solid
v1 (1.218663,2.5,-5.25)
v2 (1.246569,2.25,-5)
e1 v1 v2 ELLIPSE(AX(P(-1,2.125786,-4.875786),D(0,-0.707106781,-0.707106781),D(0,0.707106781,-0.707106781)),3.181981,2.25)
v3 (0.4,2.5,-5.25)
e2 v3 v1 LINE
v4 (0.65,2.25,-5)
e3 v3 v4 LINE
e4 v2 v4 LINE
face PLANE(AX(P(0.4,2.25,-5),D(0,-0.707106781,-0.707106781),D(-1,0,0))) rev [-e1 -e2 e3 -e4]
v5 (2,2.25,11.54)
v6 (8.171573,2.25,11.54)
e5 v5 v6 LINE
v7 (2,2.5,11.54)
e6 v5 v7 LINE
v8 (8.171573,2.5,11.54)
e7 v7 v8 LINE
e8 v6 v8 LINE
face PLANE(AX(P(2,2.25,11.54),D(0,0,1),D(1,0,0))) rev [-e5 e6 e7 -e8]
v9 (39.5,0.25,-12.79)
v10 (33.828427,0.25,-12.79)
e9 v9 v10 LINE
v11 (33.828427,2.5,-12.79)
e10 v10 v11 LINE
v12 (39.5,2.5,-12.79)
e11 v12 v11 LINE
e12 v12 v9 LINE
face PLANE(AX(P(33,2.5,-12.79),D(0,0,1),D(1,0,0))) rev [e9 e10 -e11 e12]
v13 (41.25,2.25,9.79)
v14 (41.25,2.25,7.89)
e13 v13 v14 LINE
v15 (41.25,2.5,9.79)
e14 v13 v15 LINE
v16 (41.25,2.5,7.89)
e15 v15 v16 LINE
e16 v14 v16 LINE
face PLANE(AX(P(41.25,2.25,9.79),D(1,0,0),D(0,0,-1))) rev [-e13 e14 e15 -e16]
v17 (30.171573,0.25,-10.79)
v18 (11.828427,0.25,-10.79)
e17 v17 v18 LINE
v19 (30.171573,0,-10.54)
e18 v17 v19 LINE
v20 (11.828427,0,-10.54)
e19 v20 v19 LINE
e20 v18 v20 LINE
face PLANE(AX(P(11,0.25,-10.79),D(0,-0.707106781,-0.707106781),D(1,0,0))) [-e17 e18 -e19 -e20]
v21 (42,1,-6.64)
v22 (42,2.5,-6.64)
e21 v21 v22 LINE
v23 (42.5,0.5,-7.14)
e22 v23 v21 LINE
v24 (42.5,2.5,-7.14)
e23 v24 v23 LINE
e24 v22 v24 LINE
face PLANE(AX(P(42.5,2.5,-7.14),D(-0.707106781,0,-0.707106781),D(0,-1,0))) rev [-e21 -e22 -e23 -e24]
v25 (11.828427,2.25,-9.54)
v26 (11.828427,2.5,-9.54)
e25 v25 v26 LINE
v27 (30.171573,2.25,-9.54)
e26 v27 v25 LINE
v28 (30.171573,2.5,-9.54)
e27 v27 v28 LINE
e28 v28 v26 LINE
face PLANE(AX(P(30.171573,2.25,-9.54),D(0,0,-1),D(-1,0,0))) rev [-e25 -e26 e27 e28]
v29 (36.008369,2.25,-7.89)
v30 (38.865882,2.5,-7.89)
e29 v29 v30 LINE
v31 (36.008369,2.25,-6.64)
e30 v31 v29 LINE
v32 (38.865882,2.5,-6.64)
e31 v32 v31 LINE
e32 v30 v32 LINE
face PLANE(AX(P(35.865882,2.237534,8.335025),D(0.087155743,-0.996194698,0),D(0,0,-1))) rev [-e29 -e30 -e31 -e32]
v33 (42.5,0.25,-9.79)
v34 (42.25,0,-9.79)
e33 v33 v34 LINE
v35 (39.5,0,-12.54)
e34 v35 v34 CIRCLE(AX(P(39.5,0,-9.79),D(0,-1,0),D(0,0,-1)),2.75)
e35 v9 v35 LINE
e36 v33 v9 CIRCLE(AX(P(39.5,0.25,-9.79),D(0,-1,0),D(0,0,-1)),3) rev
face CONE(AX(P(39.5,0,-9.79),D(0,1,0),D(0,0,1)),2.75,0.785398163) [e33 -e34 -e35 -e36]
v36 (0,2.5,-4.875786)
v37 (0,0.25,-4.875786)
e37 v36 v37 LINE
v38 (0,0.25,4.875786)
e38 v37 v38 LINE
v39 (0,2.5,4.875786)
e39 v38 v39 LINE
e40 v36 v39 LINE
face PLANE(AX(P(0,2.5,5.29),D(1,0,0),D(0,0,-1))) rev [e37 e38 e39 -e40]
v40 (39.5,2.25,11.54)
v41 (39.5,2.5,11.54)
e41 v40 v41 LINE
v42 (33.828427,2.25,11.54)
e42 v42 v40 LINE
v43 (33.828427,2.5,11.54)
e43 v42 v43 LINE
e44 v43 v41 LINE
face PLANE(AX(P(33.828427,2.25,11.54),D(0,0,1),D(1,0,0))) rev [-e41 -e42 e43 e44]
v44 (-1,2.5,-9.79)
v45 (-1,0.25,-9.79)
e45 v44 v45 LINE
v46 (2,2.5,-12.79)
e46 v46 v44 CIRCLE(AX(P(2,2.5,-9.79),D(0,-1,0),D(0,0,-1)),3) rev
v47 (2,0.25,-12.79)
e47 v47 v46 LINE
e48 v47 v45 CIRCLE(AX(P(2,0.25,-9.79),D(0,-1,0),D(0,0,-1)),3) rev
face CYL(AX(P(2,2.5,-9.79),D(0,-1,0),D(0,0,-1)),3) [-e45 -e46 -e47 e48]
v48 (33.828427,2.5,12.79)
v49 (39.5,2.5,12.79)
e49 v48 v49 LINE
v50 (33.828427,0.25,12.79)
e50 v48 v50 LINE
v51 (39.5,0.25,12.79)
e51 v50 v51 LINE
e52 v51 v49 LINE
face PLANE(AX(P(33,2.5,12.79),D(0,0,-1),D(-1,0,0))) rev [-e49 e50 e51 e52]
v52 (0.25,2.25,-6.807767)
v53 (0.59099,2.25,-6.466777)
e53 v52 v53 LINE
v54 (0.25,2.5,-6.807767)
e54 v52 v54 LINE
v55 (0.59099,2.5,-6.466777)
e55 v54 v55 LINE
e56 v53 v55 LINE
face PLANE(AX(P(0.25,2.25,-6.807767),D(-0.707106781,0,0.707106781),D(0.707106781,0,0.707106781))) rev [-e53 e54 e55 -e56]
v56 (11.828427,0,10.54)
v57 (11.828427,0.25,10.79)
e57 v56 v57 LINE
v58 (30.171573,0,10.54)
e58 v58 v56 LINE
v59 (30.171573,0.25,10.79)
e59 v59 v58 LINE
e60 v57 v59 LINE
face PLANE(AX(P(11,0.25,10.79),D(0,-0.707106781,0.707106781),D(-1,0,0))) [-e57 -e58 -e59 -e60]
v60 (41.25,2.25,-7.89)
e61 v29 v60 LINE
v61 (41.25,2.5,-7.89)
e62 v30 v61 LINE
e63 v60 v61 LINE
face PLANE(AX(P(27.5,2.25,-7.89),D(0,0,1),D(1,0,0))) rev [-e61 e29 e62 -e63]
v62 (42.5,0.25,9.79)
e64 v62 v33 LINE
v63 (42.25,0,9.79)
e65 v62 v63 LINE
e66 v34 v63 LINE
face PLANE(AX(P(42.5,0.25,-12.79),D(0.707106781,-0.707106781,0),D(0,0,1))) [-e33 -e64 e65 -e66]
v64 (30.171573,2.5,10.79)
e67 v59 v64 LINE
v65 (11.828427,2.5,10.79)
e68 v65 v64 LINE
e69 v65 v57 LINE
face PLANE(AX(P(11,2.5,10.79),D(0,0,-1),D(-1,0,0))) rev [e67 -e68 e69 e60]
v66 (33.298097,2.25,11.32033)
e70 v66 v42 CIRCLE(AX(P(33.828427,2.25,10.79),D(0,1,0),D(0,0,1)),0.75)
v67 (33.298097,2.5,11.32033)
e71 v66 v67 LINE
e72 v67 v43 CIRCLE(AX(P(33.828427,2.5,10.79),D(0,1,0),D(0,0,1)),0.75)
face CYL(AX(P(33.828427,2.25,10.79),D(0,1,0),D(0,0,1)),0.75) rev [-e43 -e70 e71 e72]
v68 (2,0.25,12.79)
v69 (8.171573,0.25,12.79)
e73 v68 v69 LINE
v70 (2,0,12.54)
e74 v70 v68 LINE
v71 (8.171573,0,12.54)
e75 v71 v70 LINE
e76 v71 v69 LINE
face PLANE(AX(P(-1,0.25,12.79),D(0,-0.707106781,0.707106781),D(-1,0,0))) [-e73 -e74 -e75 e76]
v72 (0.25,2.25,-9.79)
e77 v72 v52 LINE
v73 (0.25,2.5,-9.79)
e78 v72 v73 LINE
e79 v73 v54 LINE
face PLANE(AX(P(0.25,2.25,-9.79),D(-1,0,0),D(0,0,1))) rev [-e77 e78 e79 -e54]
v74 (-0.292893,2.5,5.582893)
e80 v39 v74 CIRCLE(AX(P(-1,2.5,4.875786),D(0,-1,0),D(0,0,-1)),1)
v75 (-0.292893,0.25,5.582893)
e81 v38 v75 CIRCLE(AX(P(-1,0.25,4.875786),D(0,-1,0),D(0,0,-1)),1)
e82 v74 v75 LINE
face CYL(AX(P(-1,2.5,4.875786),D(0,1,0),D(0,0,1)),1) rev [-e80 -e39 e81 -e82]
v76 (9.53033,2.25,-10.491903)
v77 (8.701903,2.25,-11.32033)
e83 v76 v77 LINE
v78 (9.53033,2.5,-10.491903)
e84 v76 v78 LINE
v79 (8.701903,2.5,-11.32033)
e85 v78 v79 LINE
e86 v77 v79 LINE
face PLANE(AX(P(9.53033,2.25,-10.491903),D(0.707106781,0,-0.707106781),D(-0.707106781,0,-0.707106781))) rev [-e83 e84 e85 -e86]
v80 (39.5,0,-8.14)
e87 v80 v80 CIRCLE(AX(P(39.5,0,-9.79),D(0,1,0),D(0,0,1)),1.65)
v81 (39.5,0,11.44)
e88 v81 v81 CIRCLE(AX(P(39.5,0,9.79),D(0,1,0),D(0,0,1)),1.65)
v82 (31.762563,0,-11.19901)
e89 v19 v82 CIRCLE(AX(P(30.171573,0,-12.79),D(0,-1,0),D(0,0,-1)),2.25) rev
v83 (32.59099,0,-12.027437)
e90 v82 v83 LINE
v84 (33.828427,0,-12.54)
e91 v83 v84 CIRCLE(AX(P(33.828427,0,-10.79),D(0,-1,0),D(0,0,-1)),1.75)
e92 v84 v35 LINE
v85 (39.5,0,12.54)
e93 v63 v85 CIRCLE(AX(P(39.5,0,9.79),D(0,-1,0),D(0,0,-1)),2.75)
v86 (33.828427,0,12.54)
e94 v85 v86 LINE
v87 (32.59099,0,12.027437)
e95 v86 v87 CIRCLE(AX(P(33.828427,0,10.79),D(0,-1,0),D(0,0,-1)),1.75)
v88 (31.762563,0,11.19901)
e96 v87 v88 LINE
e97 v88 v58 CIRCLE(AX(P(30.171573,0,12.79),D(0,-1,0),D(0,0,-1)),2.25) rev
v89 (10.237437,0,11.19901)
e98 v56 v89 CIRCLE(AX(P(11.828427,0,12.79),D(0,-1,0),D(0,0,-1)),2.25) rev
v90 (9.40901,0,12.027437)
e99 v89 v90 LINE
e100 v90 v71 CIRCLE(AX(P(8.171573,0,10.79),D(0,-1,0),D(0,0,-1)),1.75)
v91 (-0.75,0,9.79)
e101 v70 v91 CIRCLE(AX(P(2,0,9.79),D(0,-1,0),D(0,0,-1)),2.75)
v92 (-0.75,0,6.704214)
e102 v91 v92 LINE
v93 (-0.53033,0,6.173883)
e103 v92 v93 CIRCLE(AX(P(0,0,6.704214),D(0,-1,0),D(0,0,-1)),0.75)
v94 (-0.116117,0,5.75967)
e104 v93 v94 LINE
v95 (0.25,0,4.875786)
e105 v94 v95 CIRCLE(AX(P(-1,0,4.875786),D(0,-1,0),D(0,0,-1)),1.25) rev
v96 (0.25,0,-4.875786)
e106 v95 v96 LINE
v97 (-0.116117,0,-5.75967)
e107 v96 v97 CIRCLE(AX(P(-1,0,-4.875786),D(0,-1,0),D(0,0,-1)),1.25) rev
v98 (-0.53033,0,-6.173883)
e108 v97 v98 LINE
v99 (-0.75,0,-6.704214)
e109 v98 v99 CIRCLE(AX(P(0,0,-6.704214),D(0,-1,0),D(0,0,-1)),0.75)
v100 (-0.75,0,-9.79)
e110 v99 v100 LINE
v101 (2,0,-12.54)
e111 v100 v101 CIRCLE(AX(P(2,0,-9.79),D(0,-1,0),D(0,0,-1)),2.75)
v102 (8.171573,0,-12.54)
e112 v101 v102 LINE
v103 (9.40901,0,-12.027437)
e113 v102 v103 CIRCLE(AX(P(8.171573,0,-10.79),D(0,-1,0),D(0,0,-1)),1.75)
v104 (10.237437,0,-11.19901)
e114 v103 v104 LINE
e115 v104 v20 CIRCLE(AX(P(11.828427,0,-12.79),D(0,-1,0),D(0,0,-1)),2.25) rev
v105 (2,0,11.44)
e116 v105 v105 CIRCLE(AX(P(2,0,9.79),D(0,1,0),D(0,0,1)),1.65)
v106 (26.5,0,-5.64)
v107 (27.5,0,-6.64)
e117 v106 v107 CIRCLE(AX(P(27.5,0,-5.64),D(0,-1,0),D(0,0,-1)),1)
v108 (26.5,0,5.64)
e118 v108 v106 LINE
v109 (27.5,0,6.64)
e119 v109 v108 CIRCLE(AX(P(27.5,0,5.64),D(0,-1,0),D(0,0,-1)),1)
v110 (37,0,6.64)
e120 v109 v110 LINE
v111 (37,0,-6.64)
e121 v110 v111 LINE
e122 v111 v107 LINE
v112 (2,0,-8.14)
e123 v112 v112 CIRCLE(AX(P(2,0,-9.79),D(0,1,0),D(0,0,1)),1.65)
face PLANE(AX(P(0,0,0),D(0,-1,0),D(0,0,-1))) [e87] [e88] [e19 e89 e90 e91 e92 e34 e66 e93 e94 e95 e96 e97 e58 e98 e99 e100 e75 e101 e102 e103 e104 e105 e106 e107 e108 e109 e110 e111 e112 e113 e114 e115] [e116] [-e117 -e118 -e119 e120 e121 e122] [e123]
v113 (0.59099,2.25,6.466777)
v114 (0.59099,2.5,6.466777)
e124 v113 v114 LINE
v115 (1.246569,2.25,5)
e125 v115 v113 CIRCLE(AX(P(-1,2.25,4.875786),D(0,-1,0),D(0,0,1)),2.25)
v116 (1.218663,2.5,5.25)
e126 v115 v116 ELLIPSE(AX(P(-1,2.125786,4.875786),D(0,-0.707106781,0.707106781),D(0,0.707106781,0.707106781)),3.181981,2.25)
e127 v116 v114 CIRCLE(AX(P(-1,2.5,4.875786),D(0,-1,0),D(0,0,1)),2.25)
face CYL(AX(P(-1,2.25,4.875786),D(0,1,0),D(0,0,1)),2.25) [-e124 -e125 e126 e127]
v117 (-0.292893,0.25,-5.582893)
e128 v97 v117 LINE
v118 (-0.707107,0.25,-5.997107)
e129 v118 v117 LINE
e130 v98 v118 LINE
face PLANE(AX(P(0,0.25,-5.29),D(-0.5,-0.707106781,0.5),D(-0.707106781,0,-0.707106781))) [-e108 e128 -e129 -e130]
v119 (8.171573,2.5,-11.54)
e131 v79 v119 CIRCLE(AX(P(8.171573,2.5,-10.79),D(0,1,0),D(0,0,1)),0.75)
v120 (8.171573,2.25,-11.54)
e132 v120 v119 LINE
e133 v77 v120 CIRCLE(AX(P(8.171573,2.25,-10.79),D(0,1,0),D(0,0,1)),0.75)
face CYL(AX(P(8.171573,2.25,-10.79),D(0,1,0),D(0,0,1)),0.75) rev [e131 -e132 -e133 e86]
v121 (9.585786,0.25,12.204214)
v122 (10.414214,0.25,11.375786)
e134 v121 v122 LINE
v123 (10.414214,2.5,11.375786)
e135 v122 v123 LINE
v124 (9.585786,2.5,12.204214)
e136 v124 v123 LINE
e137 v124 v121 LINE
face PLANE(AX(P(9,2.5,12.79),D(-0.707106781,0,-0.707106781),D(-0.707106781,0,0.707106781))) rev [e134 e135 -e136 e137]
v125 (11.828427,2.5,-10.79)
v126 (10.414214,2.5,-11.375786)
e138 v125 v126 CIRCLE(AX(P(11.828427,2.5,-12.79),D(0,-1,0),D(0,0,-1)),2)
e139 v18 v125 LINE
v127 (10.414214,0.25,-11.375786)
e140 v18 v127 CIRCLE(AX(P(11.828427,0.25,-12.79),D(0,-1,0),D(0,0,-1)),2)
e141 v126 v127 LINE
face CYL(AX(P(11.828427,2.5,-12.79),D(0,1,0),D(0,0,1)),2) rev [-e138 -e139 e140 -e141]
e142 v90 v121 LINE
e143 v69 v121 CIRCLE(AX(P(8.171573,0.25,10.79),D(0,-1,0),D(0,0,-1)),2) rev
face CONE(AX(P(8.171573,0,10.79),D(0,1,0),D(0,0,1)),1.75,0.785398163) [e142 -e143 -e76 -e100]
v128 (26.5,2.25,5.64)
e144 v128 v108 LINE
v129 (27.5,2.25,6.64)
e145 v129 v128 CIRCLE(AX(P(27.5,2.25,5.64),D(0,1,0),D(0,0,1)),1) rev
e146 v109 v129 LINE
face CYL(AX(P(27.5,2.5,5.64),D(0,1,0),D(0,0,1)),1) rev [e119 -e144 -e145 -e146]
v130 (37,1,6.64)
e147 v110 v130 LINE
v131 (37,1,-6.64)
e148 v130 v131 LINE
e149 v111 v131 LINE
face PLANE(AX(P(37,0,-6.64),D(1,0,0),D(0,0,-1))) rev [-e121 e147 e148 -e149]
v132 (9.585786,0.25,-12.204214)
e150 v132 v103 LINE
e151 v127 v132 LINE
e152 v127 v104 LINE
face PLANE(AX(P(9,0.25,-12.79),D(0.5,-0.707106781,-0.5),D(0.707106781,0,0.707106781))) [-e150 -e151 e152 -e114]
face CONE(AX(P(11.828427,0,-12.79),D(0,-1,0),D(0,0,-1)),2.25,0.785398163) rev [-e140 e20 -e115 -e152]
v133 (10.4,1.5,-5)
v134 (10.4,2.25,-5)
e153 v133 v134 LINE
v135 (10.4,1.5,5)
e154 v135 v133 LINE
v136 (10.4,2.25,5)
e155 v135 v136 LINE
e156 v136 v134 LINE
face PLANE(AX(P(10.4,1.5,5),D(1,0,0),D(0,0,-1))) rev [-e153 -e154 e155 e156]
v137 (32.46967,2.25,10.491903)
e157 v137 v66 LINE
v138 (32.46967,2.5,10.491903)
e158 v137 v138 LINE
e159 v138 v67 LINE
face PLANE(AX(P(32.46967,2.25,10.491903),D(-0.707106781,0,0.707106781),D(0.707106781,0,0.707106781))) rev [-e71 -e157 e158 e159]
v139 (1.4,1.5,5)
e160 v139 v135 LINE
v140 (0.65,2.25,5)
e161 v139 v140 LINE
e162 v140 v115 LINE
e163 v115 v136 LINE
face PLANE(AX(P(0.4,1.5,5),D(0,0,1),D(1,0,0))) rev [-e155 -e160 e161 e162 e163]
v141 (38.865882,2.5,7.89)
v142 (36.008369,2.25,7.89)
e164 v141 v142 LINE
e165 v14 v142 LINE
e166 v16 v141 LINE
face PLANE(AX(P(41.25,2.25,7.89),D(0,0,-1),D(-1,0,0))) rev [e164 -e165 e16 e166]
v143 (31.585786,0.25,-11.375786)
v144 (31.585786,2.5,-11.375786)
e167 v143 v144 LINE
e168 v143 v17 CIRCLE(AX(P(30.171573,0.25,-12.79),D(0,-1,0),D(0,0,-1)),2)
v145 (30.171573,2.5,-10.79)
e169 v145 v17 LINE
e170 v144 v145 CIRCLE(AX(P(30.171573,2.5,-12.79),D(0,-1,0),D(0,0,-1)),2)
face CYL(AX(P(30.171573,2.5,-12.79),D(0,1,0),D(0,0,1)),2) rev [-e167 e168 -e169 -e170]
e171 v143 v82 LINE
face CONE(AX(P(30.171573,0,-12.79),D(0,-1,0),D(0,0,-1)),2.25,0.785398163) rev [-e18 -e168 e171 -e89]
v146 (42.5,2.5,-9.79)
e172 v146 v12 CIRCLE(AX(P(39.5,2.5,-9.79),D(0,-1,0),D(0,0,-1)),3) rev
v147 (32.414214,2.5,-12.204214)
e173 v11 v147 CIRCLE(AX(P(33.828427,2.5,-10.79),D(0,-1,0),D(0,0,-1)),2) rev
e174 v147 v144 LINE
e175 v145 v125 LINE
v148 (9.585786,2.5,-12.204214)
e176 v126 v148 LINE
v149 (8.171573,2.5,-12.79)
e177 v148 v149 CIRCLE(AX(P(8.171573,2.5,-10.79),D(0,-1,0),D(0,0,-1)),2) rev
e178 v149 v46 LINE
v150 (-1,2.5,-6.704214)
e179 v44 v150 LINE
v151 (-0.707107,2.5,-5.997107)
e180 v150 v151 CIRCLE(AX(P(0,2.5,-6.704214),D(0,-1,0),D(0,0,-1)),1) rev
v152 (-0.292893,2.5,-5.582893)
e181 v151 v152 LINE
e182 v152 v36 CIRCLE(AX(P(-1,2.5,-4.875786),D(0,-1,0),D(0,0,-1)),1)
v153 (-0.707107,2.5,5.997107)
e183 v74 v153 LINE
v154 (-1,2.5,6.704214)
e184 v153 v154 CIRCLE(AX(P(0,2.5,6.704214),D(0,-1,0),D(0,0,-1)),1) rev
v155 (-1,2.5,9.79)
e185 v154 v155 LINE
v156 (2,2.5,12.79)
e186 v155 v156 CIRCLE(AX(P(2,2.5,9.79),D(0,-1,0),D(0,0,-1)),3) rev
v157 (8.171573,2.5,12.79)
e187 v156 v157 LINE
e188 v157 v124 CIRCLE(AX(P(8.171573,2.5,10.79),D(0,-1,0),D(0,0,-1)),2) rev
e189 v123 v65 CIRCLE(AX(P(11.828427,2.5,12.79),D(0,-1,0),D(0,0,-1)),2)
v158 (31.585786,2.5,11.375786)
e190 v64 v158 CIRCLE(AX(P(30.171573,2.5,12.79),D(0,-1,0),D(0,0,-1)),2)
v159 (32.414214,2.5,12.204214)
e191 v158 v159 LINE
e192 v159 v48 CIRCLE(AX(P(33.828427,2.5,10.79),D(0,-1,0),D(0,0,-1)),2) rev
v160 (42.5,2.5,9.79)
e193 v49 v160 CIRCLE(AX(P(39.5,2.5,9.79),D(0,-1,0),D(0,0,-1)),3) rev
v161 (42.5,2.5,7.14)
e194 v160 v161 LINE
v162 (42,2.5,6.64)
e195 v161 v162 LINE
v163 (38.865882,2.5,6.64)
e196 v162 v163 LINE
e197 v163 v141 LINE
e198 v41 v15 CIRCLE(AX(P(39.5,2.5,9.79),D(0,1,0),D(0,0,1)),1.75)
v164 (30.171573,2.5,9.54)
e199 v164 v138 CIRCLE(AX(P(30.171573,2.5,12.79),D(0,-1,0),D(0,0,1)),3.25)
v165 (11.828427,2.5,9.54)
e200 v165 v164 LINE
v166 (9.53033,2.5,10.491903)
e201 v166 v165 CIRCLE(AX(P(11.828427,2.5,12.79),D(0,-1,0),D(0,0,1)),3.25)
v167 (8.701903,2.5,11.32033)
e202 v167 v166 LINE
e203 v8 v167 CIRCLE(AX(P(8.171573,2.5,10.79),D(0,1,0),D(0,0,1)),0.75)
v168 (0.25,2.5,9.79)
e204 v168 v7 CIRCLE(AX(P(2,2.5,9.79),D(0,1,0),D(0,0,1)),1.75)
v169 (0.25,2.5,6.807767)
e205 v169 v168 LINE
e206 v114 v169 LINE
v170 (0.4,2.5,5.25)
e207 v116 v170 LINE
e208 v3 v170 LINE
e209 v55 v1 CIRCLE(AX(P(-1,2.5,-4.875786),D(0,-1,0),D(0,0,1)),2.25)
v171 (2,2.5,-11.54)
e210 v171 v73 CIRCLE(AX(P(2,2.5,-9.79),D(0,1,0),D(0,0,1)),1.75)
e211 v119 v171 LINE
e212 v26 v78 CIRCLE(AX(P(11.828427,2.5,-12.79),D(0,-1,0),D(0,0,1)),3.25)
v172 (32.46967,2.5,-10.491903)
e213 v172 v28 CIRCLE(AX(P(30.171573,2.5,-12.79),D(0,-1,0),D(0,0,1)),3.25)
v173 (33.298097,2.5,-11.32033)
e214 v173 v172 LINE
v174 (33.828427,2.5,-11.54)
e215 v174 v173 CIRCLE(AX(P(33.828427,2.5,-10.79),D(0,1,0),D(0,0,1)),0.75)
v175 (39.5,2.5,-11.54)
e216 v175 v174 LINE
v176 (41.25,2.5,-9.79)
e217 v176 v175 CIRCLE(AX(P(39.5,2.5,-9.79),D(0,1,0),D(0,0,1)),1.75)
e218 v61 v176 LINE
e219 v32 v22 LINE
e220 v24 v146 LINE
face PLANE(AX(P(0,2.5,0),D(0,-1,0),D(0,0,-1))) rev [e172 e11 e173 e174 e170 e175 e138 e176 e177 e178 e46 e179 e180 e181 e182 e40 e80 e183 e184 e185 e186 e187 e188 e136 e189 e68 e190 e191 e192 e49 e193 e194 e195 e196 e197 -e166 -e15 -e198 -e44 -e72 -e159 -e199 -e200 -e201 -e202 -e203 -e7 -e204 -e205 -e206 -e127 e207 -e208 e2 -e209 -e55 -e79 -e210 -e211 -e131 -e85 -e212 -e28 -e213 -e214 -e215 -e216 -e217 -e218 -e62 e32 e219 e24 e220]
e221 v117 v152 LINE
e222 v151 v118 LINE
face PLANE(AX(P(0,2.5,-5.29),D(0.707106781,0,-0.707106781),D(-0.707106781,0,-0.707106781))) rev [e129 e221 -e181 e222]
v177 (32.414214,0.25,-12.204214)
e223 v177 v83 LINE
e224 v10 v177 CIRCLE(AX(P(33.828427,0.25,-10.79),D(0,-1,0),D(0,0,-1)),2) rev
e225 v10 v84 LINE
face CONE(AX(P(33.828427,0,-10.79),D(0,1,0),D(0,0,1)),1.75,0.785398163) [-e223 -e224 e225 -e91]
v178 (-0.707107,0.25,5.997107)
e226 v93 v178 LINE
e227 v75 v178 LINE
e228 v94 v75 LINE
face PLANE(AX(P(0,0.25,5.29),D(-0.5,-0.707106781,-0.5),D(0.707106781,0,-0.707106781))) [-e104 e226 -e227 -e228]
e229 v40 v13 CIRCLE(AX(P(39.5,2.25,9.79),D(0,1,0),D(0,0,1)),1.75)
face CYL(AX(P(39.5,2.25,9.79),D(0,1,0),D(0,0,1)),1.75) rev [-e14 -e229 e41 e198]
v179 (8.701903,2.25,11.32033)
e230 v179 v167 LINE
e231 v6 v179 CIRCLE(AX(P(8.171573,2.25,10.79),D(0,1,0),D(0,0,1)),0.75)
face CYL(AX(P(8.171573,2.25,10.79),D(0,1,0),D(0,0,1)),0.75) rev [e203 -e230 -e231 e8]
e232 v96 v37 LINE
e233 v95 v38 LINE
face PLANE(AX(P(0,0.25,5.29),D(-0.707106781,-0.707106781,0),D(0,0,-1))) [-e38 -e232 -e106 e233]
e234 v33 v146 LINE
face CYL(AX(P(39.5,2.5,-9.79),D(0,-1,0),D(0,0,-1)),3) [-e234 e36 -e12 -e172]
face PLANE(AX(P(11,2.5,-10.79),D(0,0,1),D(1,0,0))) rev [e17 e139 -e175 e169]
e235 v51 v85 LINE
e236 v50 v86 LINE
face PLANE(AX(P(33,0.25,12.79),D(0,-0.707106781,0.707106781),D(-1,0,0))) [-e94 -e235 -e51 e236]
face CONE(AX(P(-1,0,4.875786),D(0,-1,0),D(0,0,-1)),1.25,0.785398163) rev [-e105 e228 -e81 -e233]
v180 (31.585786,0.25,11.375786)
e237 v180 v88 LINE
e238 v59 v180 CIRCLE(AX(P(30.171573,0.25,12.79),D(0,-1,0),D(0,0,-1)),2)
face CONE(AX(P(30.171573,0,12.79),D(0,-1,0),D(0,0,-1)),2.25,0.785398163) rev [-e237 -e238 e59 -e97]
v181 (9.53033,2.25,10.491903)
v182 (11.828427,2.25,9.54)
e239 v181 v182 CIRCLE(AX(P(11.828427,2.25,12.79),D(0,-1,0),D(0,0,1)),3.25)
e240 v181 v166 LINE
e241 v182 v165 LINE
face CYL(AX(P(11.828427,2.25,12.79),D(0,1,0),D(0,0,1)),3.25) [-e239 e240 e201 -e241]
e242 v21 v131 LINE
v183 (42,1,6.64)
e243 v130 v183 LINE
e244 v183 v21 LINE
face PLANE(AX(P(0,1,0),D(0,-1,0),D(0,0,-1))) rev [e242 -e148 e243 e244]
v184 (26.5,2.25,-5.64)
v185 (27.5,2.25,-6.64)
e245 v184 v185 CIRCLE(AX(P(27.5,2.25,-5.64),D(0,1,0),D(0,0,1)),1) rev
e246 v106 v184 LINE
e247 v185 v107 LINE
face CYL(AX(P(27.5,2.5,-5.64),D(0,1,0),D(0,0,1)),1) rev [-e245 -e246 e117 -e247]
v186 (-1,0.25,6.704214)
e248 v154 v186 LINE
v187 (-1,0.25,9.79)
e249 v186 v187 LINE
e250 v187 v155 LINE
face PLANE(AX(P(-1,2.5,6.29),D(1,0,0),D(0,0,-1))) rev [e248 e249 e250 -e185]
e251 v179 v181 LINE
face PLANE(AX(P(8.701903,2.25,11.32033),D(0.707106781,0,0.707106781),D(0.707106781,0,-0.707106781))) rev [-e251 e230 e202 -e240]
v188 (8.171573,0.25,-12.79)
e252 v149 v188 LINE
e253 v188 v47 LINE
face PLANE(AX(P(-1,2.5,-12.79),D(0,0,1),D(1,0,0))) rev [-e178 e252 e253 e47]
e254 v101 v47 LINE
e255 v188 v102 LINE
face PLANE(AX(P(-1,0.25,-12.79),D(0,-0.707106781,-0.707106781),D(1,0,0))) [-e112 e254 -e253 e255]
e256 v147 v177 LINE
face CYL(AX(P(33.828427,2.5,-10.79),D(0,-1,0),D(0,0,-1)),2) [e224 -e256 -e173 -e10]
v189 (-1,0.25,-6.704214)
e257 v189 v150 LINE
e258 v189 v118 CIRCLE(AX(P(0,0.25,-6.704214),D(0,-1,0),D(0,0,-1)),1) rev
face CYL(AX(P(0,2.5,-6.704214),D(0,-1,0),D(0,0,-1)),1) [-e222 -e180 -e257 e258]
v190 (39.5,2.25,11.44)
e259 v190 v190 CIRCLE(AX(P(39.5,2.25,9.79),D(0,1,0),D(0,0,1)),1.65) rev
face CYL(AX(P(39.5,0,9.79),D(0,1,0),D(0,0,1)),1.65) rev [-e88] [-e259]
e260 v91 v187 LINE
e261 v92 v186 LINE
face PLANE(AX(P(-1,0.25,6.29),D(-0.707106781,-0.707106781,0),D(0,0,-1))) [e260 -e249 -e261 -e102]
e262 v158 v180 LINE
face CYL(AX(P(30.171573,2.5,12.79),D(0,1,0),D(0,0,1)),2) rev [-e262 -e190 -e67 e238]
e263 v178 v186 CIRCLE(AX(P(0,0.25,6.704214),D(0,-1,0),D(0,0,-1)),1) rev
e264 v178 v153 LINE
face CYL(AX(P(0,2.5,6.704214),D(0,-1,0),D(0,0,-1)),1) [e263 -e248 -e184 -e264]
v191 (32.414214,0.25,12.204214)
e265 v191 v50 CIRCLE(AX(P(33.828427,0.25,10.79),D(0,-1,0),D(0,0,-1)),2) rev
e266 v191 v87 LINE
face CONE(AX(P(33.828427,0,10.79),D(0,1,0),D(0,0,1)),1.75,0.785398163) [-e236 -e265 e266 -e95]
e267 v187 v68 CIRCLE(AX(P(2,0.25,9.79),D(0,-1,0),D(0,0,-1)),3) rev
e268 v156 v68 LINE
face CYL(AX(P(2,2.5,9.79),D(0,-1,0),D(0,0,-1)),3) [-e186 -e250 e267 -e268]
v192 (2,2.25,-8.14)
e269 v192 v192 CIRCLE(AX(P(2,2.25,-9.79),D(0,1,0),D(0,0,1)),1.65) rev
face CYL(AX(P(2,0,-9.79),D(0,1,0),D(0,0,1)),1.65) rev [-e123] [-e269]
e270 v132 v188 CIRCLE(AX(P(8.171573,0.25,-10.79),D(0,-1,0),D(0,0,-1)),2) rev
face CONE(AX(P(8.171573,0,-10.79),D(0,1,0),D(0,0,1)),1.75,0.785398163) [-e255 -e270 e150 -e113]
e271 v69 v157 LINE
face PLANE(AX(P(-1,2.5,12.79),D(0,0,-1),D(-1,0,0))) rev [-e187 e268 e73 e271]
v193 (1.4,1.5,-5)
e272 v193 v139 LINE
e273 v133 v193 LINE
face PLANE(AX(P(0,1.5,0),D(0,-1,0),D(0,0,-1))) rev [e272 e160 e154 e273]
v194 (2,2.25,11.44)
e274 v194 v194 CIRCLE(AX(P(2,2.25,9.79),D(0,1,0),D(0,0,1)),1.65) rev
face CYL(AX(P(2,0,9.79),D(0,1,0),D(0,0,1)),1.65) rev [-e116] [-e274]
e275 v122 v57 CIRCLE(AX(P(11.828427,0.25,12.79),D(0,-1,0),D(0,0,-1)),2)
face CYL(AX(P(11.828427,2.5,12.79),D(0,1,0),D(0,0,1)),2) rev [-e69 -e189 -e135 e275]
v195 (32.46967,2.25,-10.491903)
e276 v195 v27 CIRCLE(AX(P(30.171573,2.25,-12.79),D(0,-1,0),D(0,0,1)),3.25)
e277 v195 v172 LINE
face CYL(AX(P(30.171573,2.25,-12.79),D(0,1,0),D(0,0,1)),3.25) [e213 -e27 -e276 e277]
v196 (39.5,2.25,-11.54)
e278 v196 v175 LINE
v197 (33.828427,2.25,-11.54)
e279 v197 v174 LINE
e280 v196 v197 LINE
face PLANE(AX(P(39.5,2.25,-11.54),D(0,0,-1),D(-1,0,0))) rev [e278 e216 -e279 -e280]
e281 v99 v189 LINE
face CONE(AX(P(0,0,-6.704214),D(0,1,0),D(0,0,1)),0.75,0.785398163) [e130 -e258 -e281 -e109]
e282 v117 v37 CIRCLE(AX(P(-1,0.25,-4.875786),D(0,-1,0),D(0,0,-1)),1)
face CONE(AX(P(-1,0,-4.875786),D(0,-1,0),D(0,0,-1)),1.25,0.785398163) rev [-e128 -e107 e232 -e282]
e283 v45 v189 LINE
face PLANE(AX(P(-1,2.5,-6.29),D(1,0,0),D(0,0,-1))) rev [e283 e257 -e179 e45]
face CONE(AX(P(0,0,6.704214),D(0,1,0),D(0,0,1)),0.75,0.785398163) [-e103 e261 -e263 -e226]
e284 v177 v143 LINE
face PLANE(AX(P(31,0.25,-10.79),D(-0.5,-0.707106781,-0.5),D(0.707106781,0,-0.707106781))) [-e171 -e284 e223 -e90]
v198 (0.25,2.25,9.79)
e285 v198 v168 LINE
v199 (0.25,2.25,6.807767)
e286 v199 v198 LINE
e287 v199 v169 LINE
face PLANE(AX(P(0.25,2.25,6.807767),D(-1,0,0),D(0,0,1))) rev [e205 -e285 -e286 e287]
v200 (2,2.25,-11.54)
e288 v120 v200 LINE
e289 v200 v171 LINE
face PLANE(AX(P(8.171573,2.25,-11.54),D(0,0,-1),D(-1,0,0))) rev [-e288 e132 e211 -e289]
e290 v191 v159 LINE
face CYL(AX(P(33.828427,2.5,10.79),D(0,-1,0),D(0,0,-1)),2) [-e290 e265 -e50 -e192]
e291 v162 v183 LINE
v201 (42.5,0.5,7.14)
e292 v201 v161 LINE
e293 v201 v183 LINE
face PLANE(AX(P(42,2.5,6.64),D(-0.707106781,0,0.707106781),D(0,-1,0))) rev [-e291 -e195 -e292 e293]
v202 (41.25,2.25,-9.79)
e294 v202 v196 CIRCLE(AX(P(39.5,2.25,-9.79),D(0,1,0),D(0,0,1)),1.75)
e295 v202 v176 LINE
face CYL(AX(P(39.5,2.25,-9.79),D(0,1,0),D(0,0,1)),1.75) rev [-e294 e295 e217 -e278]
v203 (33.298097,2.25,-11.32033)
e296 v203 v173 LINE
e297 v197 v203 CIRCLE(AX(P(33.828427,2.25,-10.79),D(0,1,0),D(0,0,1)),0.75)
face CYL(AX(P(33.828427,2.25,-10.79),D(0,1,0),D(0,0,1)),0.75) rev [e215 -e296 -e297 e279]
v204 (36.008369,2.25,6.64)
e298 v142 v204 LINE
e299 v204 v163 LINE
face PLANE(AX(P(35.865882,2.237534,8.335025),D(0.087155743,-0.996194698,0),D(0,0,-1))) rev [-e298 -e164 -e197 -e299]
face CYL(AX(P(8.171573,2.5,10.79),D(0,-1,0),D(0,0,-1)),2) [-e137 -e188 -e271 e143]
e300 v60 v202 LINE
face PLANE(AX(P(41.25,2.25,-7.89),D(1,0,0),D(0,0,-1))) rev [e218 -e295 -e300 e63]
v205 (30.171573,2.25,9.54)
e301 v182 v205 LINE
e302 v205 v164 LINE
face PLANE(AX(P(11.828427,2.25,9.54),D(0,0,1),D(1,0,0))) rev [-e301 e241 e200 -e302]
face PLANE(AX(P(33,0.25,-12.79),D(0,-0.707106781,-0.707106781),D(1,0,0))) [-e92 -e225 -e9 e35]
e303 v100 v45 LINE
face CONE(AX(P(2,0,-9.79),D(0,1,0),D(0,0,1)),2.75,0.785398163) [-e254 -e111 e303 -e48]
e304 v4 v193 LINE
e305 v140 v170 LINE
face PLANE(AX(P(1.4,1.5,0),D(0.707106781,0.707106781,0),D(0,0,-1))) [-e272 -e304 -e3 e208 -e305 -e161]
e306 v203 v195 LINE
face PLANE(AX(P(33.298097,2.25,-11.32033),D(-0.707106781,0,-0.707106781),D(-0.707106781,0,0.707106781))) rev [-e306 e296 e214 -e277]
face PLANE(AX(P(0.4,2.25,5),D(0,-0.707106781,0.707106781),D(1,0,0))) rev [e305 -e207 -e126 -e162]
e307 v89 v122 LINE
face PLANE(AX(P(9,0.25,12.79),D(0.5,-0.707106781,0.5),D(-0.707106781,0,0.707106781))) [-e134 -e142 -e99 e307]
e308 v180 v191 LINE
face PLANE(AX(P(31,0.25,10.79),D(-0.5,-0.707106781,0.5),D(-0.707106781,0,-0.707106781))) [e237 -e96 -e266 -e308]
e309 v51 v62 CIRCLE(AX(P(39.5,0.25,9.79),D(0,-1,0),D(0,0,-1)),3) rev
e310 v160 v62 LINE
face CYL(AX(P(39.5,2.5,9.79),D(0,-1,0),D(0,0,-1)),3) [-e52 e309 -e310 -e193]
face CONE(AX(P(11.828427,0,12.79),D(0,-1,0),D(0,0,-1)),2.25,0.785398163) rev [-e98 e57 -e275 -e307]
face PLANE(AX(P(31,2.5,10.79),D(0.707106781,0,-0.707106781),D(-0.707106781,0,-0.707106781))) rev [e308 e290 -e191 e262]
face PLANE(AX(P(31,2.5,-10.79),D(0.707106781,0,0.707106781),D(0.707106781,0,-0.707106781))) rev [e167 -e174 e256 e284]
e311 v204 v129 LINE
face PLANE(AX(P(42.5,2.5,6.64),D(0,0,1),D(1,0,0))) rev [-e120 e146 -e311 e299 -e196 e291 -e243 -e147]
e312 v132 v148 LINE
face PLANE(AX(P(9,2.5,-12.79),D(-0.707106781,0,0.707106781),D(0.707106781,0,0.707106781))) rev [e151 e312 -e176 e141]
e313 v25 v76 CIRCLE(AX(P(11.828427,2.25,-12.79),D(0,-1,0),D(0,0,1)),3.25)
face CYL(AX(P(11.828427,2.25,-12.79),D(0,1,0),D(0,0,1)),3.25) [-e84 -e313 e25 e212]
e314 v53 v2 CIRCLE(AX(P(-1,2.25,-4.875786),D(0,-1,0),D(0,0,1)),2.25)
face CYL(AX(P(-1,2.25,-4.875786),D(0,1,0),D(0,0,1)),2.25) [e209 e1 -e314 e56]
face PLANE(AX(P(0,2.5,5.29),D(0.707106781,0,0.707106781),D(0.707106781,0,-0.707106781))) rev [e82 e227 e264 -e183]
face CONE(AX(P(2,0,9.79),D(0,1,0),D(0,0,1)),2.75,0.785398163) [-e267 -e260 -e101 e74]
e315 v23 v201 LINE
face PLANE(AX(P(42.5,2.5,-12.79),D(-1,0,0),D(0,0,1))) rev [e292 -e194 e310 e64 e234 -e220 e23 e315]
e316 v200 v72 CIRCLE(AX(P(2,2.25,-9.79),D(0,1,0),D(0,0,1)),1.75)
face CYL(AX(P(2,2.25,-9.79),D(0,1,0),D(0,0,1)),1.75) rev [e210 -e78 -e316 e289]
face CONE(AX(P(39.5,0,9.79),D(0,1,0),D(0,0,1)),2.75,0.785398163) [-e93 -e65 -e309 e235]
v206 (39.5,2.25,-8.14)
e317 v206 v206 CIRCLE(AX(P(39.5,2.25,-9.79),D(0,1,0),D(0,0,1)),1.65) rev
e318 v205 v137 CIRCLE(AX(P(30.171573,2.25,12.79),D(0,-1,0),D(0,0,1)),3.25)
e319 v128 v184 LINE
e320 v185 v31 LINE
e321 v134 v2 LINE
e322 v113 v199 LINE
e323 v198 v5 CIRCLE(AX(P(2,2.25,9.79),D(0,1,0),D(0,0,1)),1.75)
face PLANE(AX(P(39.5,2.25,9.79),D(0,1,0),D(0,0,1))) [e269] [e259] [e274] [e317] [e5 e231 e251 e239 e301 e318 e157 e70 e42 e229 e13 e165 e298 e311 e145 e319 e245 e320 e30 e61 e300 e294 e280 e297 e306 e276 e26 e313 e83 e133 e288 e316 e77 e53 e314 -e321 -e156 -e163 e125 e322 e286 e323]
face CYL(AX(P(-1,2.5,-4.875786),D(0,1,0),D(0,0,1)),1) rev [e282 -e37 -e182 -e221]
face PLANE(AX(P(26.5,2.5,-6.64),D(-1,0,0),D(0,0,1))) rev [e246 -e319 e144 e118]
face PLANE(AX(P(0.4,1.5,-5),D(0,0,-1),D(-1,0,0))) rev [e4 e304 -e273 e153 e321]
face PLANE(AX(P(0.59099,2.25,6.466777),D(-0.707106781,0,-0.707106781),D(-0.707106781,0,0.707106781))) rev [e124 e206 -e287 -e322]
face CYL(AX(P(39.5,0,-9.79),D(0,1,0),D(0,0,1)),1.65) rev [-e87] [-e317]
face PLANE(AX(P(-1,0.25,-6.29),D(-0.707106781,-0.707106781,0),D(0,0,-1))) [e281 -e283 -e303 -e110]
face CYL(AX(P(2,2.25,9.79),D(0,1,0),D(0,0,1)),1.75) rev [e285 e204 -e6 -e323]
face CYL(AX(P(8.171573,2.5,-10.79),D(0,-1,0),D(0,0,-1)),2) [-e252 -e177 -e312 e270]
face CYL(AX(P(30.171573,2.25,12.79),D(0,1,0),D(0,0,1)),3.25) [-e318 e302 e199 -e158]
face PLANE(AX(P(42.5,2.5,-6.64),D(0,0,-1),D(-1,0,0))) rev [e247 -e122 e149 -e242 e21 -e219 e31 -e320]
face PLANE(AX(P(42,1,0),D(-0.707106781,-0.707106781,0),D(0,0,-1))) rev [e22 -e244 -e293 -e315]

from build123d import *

# Parameters (mm, degrees)
BOSS_EXTRUDE1_DEPTH = 2.5
FILLET1_R           = 3
FILLET2_R           = 1
FILLET3_R           = 2
SKETCH3_W           = 16.773949538
SKETCH3_H           = 15.481085324
BOSS_EXTRUDE2_DEPTH = 1
CHAMFER1_SIZE       = 0.5
SKETCH5_R           = 1.65
CUT_EXTRUDE3_DEPTH  = 45.453167491
SKETCH6_W           = 10
SKETCH6_H           = 10
CUT_EXTRUDE4_DEPTH  = 1
CHAMFER2_SIZE       = 0.25
CHAMFER3_SIZE       = 0.25
SKETCH7_W           = 4
SKETCH7_H           = 13.28
CUT_EXTRUDE5_DEPTH  = 45.408153531
CHAMFER4_SIZE       = 1
CUT_EXTRUDE6_DEPTH  = 0.25
CUT_EXTRUDE8_DEPTH  = 10
SKETCH11_W          = 19.67193657
SKETCH11_H          = 16.670050146
CUT_EXTRUDE9_DEPTH  = 0.25
CHAMFER5_SIZE       = 3
CHAMFER5_SIZE_2     = 0.262465991


# Some blends are built 0.0001 mm under size
with BuildPart() as part:
    # Sketch1 → Boss-Extrude1 (new body)
    with BuildSketch(Plane(origin=(0, 0, 0), x_dir=(1, 0, 0), z_dir=(0, 1, 0))):
        Polygon((0, -5.29), (0, 5.29), (-1, 6.29), (-1, 12.79), (9, 12.79), (11, 10.79), (31, 10.79), (33, 12.79), (42.5, 12.79), (42.5, 6.64), (26.5, 6.64), (26.5, -6.64), (42.5, -6.64), (42.5, -12.79), (33, -12.79), (31, -10.79), (11, -10.79), (9, -12.79), (-1, -12.79), (-1, -6.29), align=None)
    extrude(amount=BOSS_EXTRUDE1_DEPTH)

    # Fillet1
    fillet1_edges = [part.edges().sort_by_distance(p)[0] for p in [
        (-1, 1.25, -12.79),
        (42.5, 1.25, -12.79),
        (42.5, 1.25, 12.79),
        (-1, 1.25, 12.79),
    ]]
    fillet(fillet1_edges, radius=FILLET1_R)

    # Fillet2
    fillet2_edges = [part.edges().sort_by_distance(p)[0] for p in [
        (-1, 1.25, -6.29),
        (26.5, 1.25, -6.64),
        (26.5, 1.25, 6.64),
        (-1, 1.25, 6.29),
        (0, 1.25, 5.29),
        (0, 1.25, -5.29),
    ]]
    fillet(fillet2_edges, radius=FILLET2_R)

    # Fillet3
    fillet3_edges = [part.edges().sort_by_distance(p)[0] for p in [
        (9, 1.25, -12.79),
        (11, 1.25, -10.79),
        (31, 1.25, -10.79),
        (33, 1.25, -12.79),
        (33, 1.25, 12.79),
        (31, 1.25, 10.79),
        (11, 1.25, 10.79),
        (9, 1.25, 12.79),
    ]]
    fillet(fillet3_edges, radius=FILLET3_R)

    # Sketch3 → Boss-Extrude2 (add)
    with BuildSketch(Plane.XZ):
        with Locations((34.113025231, 0.175921424)):
            Rectangle(SKETCH3_W, SKETCH3_H)
    extrude(amount=-BOSS_EXTRUDE2_DEPTH)

    # Chamfer1
    chamfer1_edges = [part.edges().sort_by_distance(p)[0] for p in [
        (42.5, 1, 0),
        (42.5, 1.75, -6.64),
        (42.5, 1.75, 6.64),
    ]]
    chamfer(chamfer1_edges, length=CHAMFER1_SIZE)

    # Sketch5 → Cut-Extrude3 (cut, through all)
    with BuildSketch(Plane(origin=(0, 2.5, 0), x_dir=(1, 0, 0), z_dir=(0, 1, 0))):
        with Locations(Location((2, 9.79, 0), (0, 0, 270))):
            Circle(SKETCH5_R)
        with Locations(Location((2, -9.79, 0), (0, 0, 270))):
            Circle(SKETCH5_R)
        with Locations(Location((39.5, 9.79, 0), (0, 0, 270))):
            Circle(SKETCH5_R)
        with Locations(Location((39.5, -9.79, 0), (0, 0, 270))):
            Circle(SKETCH5_R)
    extrude(amount=-CUT_EXTRUDE3_DEPTH, mode=Mode.SUBTRACT)

    # Sketch6 → Cut-Extrude4 (cut)
    with BuildSketch(Plane(origin=(0, 2.5, 0), x_dir=(1, 0, 0), z_dir=(0, 1, 0))):
        with Locations((5.4, 0)):
            Rectangle(SKETCH6_W, SKETCH6_H)
    extrude(amount=-CUT_EXTRUDE4_DEPTH, mode=Mode.SUBTRACT)

    # Chamfer2
    chamfer2_edges = [part.edges().sort_by_distance(p)[0] for p in [
        (10.4, 2.5, 0),
        (5.4, 2.5, -5),
        (5.4, 2.5, 5),
    ]]
    chamfer(chamfer2_edges, length=CHAMFER2_SIZE)

    # Chamfer3
    chamfer3_edges = [part.edges().sort_by_distance(p)[0] for p in [
        (36.664213562, 0, 12.79),
        (5.085786438, 0, -12.79),
        (10, 0, -11.79),
        (21, 0, -10.79),
        (32, 0, -11.79),
        (32, 0, 11.79),
        (21, 0, 10.79),
        (10, 0, 11.79),
        (8.93693974, 0, -12.637759065),
        (33.06306026, 0, -12.637759065),
        (8.93693974, 0, 12.637759065),
        (33.06306026, 0, 12.637759065),
        (30.93693974, 0, 10.942240935),
        (11.06306026, 0, 10.942240935),
        (30.93693974, 0, -10.942240935),
        (11.06306026, 0, -10.942240935),
        (42.5, 0, 0),
        (-1, 0, -8.247106781),
        (36.664213562, 0, -12.79),
        (5.085786438, 0, 12.79),
        (-0.121320344, 0, 11.911320344),
        (41.621320344, 0, 11.911320344),
        (41.621320344, 0, -11.911320344),
        (-0.121320344, 0, -11.911320344),
        (-1, 0, 8.247106781),
        (-0.5, 0, 5.79),
        (0, 0, 0),
        (-0.5, 0, -5.79),
        (-0.923879533, 0, -6.32153013),
        (-0.923879533, 0, 6.32153013),
        (-0.076120467, 0, 5.25846987),
        (-0.076120467, 0, -5.25846987),
    ]]
    chamfer(chamfer3_edges, length=CHAMFER3_SIZE)

    # Sketch7 → Cut-Extrude5 (cut, through all)
    with BuildSketch(Plane(origin=(0, 1, 0), x_dir=(1, 0, 0), z_dir=(0, 1, 0))):
        with Locations((35, 0)):
            Rectangle(SKETCH7_W, SKETCH7_H)
    extrude(amount=-CUT_EXTRUDE5_DEPTH, mode=Mode.SUBTRACT)

    # Chamfer4
    chamfer4_edges = [part.edges().sort_by_distance(p)[0] for p in [
        (0.4, 1.5, 0),
    ]]
    chamfer(chamfer4_edges, length=CHAMFER4_SIZE - 0.0001)  # a hair under: the kernel refuses the full size

    # Sketch8 → Cut-Extrude6 (cut)
    with BuildSketch(Plane(origin=(0, 2.5, 0), x_dir=(1, 0, 0), z_dir=(0, 1, 0))):
        with BuildLine():
            Line((41.25, -9.79), (41.25, -7.89))
            Line((41.25, -7.89), (27.5, -7.89))
            ThreePointArc((27.5, -7.89), (25.909009742, -7.230990258), (25.25, -5.64))
            Line((25.25, -5.64), (25.25, 5.64))
            ThreePointArc((25.25, 5.64), (25.909009742, 7.230990258), (27.5, 7.89))
            Line((27.5, 7.89), (41.25, 7.89))
            Line((41.25, 7.89), (41.25, 9.79))
            ThreePointArc((41.25, 9.79), (40.737436867, 11.027436867), (39.5, 11.54))
            Line((39.5, 11.54), (33.828427125, 11.54))
            ThreePointArc((33.828427125, 11.54), (33.54141455, 11.482909649), (33.298097039, 11.320330086))
            Line((33.298097039, 11.320330086), (32.469669914, 10.491902961))
            ThreePointArc((32.469669914, 10.491902961), (31.41529403, 9.787391519), (30.171572875, 9.54))
            Line((30.171572875, 9.54), (11.828427125, 9.54))
            ThreePointArc((11.828427125, 9.54), (10.58470597, 9.787391519), (9.530330086, 10.491902961))
            Line((9.530330086, 10.491902961), (8.701902961, 11.320330086))
            ThreePointArc((8.701902961, 11.320330086), (8.45858545, 11.482909649), (8.171572875, 11.54))
            Line((8.171572875, 11.54), (2, 11.54))
            ThreePointArc((2, 11.54), (0.762563133, 11.027436867), (0.25, 9.79))
            Line((0.25, 9.79), (0.25, 6.807766953))
            Line((0.25, 6.807766953), (0.590990258, 6.466776695))
            ThreePointArc((0.590990258, 6.466776695), (1.078728948, 5.73682416), (1.25, 4.875786438))
            Line((1.25, 4.875786438), (1.25, -4.875786438))
            ThreePointArc((1.25, -4.875786438), (1.078728948, -5.73682416), (0.590990258, -6.466776695))
            Line((0.590990258, -6.466776695), (0.25, -6.807766953))
            Line((0.25, -6.807766953), (0.25, -9.79))
            ThreePointArc((0.25, -9.79), (0.762563133, -11.027436867), (2, -11.54))
            Line((2, -11.54), (8.171572875, -11.54))
            ThreePointArc((8.171572875, -11.54), (8.45858545, -11.482909649), (8.701902961, -11.320330086))
            Line((8.701902961, -11.320330086), (9.530330086, -10.491902961))
            ThreePointArc((9.530330086, -10.491902961), (10.58470597, -9.787391519), (11.828427125, -9.54))
            Line((11.828427125, -9.54), (30.171572875, -9.54))
            ThreePointArc((30.171572875, -9.54), (31.41529403, -9.787391519), (32.469669914, -10.491902961))
            Line((32.469669914, -10.491902961), (33.298097039, -11.320330086))
            ThreePointArc((33.298097039, -11.320330086), (33.54141455, -11.482909649), (33.828427125, -11.54))
            Line((33.828427125, -11.54), (39.5, -11.54))
            ThreePointArc((39.5, -11.54), (40.737436867, -11.027436867), (41.25, -9.79))
        make_face()
    extrude(amount=-CUT_EXTRUDE6_DEPTH, mode=Mode.SUBTRACT)

    # Sketch10 → Cut-Extrude8 (cut)
    with BuildSketch(Plane(origin=(0, 1, 0), x_dir=(1, 0, 0), z_dir=(0, 1, 0))):
        with BuildLine():
            Line((27.5, -6.64), (33, -6.64))
            Line((33, -6.64), (33, 6.64))
            Line((33, 6.64), (27.5, 6.64))
            ThreePointArc((27.5, 6.64), (26.792893219, 6.347106781), (26.5, 5.64))
            Line((26.5, 5.64), (26.5, -5.64))
            ThreePointArc((26.5, -5.64), (26.792893219, -6.347106781), (27.5, -6.64))
        make_face()
    extrude(amount=-CUT_EXTRUDE8_DEPTH, mode=Mode.SUBTRACT)

    # Sketch11 → Cut-Extrude9 (cut)
    with BuildSketch(Plane(origin=(0, 2.5, 0), x_dir=(1, 0, 0), z_dir=(0, 1, 0))):
        with Locations((26.029913711, 0)):
            Rectangle(SKETCH11_W, SKETCH11_H)
    extrude(amount=-CUT_EXTRUDE9_DEPTH, mode=Mode.SUBTRACT)

    # Chamfer5
    # the kernel refuses this chamfer: 3, 0.262465991 mm, written as the material it takes off along each edge
    with BuildSketch(Plane(origin=(35.865881996, 2.5, 15.68890224), x_dir=(0.9999943799678764, 0.0033526157940331697, 0), z_dir=(0, 0, -1))) as chamfer5_piece_1_section:
        Polygon((CHAMFER5_SIZE * 0.999994379968, CHAMFER5_SIZE * 0.00335261579403), (-CHAMFER5_SIZE_2 * 0.00335261578864, CHAMFER5_SIZE_2 * 0.999994378359), (0, 0), align=None)
    chamfer5_piece_1 = extrude(amount=16.847804479, mode=Mode.PRIVATE)
    chamfer5_piece_1 = split(chamfer5_piece_1, bisect_by=Plane(origin=(36.868035548, 2.25, 7.265), z_dir=(0, 1, 0)), keep=Keep.TOP, mode=Mode.PRIVATE)
    chamfer5_piece_1 = split(chamfer5_piece_1, bisect_by=Plane(origin=(36.868035548, 2.412888159, 11.54), z_dir=(0, 0, -1)), keep=Keep.TOP, mode=Mode.PRIVATE)
    add(chamfer5_piece_1, mode=Mode.SUBTRACT)
    with BuildSketch(Plane(origin=(35.865881996, 2.5, 1.15890224), x_dir=(0.9999943799678764, 0.0033526157940331697, 0), z_dir=(0, 0, -1))) as chamfer5_piece_2_section:
        Polygon((CHAMFER5_SIZE * 0.999994379968, CHAMFER5_SIZE * 0.00335261579403), (-CHAMFER5_SIZE_2 * 0.00335261578864, CHAMFER5_SIZE_2 * 0.999994378359), (0, 0), align=None)
    chamfer5_piece_2 = extrude(amount=9.04890224, mode=Mode.PRIVATE)
    chamfer5_piece_2 = split(chamfer5_piece_2, bisect_by=Plane(origin=(36.868035548, 2.25, -7.265), z_dir=(0, 1, 0)), keep=Keep.TOP, mode=Mode.PRIVATE)
    add(chamfer5_piece_2, mode=Mode.SUBTRACT)


solid = part.part
